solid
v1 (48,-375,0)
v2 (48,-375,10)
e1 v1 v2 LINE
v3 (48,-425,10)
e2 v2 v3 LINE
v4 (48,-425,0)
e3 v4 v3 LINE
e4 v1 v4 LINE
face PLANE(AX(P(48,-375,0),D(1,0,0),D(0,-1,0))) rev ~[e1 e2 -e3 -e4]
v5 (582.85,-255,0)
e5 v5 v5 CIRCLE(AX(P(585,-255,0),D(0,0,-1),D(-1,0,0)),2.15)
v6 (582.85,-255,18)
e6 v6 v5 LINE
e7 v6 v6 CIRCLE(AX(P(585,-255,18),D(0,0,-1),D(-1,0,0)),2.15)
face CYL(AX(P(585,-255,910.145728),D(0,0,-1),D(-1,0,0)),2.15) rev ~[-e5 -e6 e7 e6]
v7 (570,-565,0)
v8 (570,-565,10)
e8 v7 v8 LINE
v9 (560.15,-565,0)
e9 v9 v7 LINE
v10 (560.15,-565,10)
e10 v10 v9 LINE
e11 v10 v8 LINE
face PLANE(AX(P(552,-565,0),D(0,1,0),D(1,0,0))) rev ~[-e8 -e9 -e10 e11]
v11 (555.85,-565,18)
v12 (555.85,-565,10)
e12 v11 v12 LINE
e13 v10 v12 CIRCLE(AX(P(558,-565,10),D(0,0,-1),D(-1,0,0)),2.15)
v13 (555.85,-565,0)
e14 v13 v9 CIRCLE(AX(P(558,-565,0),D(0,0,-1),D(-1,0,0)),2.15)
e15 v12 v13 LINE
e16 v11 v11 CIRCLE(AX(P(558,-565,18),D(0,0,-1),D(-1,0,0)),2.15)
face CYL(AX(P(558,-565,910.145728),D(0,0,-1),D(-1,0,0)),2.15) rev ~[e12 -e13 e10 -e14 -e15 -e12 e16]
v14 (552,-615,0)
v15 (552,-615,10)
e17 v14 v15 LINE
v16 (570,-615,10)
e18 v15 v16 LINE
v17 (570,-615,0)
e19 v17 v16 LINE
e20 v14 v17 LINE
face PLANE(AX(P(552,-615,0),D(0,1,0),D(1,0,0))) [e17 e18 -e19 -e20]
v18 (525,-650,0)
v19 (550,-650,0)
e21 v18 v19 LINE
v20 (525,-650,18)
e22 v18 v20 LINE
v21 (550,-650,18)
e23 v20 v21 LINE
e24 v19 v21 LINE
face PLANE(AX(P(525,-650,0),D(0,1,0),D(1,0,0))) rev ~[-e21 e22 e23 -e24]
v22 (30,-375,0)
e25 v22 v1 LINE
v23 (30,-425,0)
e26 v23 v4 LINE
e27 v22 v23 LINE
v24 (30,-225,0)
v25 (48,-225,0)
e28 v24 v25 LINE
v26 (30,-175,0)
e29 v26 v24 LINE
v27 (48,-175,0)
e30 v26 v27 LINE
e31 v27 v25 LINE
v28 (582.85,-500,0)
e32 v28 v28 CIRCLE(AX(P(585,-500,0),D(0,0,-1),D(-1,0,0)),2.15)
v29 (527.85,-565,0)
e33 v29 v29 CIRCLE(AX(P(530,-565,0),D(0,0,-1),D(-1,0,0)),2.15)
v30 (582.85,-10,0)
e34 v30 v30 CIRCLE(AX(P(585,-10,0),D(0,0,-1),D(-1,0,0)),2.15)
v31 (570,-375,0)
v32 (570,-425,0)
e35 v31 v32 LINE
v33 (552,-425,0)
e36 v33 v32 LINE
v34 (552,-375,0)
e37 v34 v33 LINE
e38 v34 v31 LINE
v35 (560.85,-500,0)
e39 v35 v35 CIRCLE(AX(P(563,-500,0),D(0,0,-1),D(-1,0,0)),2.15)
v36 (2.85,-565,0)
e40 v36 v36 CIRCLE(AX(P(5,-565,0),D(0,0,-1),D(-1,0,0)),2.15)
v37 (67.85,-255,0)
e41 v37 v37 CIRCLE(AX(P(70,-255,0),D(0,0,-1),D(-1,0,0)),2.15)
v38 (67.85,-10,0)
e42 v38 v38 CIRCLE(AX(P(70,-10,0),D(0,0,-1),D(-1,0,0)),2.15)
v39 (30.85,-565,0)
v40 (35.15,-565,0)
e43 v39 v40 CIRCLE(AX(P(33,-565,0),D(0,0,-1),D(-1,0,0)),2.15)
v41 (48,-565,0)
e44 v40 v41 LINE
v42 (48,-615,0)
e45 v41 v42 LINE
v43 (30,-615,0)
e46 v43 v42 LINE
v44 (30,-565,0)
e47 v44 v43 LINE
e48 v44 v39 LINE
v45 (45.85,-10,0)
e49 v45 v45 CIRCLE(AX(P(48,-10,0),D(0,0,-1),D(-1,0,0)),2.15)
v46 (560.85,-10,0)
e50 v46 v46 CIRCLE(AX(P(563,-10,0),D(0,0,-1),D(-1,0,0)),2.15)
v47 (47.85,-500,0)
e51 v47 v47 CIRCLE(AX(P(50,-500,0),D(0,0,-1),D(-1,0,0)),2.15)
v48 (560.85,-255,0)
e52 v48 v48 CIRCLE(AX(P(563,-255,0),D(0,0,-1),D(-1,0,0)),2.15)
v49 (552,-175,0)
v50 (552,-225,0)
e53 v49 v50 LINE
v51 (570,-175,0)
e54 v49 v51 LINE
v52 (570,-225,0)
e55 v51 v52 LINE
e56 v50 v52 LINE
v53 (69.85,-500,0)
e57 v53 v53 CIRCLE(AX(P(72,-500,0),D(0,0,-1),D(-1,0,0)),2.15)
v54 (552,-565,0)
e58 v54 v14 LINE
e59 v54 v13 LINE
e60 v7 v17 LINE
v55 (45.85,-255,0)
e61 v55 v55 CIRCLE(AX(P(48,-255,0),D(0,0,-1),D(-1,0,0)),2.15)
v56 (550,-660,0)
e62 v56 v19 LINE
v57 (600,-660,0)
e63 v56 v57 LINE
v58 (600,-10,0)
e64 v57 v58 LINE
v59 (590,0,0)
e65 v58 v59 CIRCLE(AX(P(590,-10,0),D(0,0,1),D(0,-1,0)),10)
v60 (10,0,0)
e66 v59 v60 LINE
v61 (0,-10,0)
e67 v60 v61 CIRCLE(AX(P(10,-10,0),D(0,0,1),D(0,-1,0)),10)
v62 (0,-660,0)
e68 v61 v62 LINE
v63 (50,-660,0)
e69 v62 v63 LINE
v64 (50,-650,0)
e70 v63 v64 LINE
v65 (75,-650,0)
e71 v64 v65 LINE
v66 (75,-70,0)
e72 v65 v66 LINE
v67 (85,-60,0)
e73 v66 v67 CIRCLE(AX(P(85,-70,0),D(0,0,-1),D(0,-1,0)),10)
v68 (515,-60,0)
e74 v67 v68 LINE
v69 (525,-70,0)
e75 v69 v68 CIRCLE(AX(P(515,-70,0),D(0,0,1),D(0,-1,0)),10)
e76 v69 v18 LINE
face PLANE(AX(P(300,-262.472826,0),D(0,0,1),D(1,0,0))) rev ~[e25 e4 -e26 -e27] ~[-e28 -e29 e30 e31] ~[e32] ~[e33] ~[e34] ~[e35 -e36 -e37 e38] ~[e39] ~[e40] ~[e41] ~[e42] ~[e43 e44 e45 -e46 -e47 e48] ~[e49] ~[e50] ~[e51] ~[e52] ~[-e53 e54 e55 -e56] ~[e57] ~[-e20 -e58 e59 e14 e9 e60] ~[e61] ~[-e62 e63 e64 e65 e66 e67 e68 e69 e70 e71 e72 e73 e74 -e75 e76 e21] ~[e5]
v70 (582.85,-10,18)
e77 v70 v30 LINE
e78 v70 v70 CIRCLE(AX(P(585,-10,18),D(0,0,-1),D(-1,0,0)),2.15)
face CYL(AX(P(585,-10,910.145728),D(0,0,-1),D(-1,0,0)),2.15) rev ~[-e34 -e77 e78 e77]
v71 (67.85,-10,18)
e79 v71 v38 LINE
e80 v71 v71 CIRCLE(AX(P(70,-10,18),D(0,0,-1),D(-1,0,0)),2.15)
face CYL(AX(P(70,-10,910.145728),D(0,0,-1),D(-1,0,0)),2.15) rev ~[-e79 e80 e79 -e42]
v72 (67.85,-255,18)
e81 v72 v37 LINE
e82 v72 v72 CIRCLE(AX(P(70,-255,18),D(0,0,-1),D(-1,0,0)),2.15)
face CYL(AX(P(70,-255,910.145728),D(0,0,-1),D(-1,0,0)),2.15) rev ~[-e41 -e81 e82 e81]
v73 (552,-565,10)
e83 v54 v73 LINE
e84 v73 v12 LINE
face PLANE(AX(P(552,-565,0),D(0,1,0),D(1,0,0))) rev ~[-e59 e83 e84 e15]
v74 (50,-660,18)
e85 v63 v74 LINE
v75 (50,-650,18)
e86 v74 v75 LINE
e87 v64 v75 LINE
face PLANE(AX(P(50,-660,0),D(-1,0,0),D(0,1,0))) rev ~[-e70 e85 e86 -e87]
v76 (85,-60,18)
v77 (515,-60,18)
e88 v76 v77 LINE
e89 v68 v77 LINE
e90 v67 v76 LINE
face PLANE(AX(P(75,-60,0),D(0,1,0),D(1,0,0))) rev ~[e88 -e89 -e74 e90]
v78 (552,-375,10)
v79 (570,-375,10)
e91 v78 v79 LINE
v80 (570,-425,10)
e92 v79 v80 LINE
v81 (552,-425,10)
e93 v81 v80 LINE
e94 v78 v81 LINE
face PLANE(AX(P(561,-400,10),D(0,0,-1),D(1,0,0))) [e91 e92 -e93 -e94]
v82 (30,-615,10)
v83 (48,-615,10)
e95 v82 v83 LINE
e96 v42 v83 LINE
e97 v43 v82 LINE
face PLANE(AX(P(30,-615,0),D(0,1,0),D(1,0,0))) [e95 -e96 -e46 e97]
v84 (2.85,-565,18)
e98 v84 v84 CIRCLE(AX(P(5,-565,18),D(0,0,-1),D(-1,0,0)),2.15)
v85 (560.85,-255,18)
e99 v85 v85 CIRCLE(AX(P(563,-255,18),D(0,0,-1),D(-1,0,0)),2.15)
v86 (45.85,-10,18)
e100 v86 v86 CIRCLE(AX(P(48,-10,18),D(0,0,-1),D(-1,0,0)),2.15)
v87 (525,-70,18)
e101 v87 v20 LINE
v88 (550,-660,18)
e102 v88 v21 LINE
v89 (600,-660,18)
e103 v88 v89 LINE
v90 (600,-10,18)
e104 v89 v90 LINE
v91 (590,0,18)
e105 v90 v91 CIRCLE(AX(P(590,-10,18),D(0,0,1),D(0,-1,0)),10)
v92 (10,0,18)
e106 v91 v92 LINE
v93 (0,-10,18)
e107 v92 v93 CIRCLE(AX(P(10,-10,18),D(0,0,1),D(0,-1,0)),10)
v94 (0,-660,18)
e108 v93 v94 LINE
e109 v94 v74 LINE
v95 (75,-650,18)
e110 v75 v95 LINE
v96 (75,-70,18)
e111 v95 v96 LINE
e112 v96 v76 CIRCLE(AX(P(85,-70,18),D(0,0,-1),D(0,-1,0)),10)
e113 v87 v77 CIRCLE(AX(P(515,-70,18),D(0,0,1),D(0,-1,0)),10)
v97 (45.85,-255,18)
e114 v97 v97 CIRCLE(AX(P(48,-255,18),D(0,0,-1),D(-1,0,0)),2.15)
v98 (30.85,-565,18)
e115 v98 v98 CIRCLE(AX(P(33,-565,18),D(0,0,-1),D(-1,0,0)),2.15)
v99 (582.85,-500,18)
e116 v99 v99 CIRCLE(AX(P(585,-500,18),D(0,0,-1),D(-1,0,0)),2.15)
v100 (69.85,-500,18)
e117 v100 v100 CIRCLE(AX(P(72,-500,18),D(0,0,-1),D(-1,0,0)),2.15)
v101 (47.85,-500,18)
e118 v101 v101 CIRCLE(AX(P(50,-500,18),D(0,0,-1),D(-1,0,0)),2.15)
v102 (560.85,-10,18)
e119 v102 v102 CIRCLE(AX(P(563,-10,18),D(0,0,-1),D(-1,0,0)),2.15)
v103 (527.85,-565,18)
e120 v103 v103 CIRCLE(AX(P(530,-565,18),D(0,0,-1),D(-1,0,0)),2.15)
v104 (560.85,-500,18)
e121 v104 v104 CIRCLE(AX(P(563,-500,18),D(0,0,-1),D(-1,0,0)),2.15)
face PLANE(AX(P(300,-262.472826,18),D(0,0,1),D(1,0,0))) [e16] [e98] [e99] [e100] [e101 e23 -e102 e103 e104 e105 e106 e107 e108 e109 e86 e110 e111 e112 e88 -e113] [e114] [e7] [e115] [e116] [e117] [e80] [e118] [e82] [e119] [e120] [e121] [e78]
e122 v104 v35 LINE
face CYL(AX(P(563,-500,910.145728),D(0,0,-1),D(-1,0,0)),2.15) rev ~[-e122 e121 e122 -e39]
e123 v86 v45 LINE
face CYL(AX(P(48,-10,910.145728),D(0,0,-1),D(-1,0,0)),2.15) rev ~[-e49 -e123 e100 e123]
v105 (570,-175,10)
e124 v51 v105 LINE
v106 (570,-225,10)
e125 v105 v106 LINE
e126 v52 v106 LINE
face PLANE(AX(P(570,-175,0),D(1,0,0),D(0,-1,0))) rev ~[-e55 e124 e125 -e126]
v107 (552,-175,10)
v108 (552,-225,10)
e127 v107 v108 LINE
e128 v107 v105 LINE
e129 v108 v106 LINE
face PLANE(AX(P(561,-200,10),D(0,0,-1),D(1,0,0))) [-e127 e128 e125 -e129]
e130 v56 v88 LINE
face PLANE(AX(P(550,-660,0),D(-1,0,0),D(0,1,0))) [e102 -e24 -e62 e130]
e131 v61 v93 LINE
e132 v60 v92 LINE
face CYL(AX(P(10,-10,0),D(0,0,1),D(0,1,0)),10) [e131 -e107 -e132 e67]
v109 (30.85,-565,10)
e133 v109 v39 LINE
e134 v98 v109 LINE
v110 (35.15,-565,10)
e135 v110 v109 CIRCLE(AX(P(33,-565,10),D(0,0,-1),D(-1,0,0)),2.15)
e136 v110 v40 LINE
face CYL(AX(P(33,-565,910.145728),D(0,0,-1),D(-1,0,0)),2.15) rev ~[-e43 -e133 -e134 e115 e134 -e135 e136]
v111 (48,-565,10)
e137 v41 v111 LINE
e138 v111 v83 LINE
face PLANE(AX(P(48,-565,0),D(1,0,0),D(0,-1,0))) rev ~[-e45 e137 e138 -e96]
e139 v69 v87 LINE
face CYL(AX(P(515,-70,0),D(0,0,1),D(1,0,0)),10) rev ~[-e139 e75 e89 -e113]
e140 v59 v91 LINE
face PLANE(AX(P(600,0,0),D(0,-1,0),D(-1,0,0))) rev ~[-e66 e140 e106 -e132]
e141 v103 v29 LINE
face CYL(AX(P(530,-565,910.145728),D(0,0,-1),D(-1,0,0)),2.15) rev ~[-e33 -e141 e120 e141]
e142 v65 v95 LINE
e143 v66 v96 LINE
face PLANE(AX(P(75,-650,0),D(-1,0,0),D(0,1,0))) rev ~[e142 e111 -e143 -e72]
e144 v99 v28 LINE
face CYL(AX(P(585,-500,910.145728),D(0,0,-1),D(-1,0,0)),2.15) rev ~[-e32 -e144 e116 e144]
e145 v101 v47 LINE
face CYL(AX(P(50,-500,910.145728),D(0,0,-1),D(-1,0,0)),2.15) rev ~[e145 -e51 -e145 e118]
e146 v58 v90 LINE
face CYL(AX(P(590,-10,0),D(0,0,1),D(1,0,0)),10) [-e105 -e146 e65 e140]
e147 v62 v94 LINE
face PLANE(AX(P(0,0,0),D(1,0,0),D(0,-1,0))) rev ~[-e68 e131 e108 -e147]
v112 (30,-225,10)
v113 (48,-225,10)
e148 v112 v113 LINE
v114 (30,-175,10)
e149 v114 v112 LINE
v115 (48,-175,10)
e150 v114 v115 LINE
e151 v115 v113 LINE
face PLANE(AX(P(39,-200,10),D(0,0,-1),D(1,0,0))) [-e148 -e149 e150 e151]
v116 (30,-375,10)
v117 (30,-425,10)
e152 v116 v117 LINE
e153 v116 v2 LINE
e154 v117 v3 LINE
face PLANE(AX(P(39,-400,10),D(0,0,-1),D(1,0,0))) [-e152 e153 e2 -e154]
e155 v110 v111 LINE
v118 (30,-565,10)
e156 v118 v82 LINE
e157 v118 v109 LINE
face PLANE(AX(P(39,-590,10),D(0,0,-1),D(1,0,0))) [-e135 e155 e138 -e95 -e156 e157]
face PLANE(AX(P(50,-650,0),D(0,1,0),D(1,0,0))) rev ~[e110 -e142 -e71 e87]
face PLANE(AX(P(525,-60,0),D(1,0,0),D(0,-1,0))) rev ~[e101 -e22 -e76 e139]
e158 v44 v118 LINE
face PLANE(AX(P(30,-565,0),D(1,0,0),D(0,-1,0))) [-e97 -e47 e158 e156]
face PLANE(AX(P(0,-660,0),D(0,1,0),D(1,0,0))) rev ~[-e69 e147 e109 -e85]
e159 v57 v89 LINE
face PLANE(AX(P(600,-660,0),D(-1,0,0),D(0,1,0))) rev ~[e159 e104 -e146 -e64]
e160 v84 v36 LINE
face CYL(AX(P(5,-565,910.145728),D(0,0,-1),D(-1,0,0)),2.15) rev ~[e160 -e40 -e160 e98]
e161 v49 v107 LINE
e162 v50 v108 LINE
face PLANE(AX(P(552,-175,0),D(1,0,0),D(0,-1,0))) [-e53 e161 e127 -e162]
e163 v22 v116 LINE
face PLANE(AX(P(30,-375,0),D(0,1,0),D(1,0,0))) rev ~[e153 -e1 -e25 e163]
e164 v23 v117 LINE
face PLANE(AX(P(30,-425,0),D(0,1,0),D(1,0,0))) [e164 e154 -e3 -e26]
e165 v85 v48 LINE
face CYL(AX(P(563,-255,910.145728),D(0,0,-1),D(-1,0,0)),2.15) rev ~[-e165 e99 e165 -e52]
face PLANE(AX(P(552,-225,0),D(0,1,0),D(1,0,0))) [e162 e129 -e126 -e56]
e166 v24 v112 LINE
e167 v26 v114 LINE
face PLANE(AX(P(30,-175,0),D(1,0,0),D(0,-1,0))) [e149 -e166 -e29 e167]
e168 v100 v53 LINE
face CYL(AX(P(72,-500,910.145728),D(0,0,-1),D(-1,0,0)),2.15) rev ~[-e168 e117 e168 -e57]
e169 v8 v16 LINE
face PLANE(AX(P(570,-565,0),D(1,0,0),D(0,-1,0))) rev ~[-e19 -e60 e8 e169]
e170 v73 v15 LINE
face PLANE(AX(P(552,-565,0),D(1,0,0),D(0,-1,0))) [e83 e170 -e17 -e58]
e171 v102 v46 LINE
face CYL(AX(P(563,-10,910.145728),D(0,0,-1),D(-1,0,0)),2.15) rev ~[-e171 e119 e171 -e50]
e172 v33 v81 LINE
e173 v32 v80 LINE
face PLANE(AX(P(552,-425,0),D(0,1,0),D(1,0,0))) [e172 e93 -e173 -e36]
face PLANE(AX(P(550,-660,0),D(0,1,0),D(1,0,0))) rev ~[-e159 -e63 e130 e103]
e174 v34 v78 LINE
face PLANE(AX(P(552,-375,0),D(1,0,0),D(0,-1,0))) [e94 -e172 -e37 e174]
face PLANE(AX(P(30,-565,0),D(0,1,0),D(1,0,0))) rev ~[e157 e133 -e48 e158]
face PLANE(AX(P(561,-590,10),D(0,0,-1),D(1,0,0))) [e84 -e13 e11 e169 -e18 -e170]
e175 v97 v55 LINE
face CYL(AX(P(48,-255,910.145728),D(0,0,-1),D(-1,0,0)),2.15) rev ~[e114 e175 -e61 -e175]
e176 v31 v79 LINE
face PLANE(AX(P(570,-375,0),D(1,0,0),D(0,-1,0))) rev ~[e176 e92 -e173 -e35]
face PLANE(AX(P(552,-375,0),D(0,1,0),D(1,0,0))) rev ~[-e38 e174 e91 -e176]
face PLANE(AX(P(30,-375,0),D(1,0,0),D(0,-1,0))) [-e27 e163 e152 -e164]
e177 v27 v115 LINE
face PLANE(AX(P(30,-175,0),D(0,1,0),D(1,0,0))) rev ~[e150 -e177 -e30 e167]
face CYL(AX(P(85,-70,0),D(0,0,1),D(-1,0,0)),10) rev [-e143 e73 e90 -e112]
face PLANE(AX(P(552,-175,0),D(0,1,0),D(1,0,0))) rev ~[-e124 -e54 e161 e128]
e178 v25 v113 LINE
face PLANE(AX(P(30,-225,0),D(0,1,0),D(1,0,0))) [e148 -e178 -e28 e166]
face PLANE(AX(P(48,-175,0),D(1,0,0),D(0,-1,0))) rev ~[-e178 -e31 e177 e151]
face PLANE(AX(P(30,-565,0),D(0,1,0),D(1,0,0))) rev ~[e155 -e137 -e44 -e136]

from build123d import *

# Parameters (mm, degrees)
F0_W     = 50
F0_H     = 10
F1_DEPTH = 18
F2_W     = 18
F2_H     = 50
F3_DEPTH = 10
F5_D     = 4.3
F6_R     = 10
F7_R     = 10


# Not quite as in the source:
# - a feature names something its author has since deleted; it is built from what else it names


with BuildPart() as f1:
    # F0 (on Top) → F1 (new body)
    with BuildSketch(Plane.XY):
        Polygon((600, 0), (0, 0), (0, -650), (50, -650), (75, -650), (75, -60), (525, -60), (525, -650), (550, -650), (600, -650), align=None)
        with Locations((25, -655)):
            Rectangle(F0_W, F0_H)
        with Locations((575, -655)):
            Rectangle(F0_W, F0_H)
    extrude(amount=F1_DEPTH)

    # F2 (on face) → F3 (cut)
    with BuildSketch(Plane(origin=(0, 0, 0), x_dir=(1, 0, 0), z_dir=(0, 0, -1))):
        with Locations((39, 590)):
            Rectangle(F2_W, F2_H)
        with Locations((39, 400)):
            Rectangle(F2_W, F2_H)
        with Locations((39, 200)):
            Rectangle(F2_W, F2_H)
        with Locations((561, 200)):
            Rectangle(F2_W, F2_H)
        with Locations((561, 400)):
            Rectangle(F2_W, F2_H)
        with Locations((561, 590)):
            Rectangle(F2_W, F2_H)
    extrude(amount=-F3_DEPTH, mode=Mode.SUBTRACT)

    # F5 (through all)
    with Locations(Plane.XY.offset(18)):
        with Locations((563, -10), (585, -10), (563, -255), (563, -500), (585, -500), (585, -255), (48, -10), (70, -10), (48, -255), (70, -255), (50, -500), (72, -500), (530, -565), (558, -565), (5, -565), (33, -565)):
            Hole(F5_D / 2)

    # F6
    f6_edges = [f1.edges().sort_by_distance(p)[0] for p in [
        (75, -60, 9),
        (525, -60, 9),
    ]]
    fillet(f6_edges, radius=F6_R)

    # F7
    f7_edges = [f1.edges().sort_by_distance(p)[0] for p in [
        (600, 0, 9),
        (0, 0, 9),
    ]]
    fillet(f7_edges, radius=F7_R)


solid = f1.part
